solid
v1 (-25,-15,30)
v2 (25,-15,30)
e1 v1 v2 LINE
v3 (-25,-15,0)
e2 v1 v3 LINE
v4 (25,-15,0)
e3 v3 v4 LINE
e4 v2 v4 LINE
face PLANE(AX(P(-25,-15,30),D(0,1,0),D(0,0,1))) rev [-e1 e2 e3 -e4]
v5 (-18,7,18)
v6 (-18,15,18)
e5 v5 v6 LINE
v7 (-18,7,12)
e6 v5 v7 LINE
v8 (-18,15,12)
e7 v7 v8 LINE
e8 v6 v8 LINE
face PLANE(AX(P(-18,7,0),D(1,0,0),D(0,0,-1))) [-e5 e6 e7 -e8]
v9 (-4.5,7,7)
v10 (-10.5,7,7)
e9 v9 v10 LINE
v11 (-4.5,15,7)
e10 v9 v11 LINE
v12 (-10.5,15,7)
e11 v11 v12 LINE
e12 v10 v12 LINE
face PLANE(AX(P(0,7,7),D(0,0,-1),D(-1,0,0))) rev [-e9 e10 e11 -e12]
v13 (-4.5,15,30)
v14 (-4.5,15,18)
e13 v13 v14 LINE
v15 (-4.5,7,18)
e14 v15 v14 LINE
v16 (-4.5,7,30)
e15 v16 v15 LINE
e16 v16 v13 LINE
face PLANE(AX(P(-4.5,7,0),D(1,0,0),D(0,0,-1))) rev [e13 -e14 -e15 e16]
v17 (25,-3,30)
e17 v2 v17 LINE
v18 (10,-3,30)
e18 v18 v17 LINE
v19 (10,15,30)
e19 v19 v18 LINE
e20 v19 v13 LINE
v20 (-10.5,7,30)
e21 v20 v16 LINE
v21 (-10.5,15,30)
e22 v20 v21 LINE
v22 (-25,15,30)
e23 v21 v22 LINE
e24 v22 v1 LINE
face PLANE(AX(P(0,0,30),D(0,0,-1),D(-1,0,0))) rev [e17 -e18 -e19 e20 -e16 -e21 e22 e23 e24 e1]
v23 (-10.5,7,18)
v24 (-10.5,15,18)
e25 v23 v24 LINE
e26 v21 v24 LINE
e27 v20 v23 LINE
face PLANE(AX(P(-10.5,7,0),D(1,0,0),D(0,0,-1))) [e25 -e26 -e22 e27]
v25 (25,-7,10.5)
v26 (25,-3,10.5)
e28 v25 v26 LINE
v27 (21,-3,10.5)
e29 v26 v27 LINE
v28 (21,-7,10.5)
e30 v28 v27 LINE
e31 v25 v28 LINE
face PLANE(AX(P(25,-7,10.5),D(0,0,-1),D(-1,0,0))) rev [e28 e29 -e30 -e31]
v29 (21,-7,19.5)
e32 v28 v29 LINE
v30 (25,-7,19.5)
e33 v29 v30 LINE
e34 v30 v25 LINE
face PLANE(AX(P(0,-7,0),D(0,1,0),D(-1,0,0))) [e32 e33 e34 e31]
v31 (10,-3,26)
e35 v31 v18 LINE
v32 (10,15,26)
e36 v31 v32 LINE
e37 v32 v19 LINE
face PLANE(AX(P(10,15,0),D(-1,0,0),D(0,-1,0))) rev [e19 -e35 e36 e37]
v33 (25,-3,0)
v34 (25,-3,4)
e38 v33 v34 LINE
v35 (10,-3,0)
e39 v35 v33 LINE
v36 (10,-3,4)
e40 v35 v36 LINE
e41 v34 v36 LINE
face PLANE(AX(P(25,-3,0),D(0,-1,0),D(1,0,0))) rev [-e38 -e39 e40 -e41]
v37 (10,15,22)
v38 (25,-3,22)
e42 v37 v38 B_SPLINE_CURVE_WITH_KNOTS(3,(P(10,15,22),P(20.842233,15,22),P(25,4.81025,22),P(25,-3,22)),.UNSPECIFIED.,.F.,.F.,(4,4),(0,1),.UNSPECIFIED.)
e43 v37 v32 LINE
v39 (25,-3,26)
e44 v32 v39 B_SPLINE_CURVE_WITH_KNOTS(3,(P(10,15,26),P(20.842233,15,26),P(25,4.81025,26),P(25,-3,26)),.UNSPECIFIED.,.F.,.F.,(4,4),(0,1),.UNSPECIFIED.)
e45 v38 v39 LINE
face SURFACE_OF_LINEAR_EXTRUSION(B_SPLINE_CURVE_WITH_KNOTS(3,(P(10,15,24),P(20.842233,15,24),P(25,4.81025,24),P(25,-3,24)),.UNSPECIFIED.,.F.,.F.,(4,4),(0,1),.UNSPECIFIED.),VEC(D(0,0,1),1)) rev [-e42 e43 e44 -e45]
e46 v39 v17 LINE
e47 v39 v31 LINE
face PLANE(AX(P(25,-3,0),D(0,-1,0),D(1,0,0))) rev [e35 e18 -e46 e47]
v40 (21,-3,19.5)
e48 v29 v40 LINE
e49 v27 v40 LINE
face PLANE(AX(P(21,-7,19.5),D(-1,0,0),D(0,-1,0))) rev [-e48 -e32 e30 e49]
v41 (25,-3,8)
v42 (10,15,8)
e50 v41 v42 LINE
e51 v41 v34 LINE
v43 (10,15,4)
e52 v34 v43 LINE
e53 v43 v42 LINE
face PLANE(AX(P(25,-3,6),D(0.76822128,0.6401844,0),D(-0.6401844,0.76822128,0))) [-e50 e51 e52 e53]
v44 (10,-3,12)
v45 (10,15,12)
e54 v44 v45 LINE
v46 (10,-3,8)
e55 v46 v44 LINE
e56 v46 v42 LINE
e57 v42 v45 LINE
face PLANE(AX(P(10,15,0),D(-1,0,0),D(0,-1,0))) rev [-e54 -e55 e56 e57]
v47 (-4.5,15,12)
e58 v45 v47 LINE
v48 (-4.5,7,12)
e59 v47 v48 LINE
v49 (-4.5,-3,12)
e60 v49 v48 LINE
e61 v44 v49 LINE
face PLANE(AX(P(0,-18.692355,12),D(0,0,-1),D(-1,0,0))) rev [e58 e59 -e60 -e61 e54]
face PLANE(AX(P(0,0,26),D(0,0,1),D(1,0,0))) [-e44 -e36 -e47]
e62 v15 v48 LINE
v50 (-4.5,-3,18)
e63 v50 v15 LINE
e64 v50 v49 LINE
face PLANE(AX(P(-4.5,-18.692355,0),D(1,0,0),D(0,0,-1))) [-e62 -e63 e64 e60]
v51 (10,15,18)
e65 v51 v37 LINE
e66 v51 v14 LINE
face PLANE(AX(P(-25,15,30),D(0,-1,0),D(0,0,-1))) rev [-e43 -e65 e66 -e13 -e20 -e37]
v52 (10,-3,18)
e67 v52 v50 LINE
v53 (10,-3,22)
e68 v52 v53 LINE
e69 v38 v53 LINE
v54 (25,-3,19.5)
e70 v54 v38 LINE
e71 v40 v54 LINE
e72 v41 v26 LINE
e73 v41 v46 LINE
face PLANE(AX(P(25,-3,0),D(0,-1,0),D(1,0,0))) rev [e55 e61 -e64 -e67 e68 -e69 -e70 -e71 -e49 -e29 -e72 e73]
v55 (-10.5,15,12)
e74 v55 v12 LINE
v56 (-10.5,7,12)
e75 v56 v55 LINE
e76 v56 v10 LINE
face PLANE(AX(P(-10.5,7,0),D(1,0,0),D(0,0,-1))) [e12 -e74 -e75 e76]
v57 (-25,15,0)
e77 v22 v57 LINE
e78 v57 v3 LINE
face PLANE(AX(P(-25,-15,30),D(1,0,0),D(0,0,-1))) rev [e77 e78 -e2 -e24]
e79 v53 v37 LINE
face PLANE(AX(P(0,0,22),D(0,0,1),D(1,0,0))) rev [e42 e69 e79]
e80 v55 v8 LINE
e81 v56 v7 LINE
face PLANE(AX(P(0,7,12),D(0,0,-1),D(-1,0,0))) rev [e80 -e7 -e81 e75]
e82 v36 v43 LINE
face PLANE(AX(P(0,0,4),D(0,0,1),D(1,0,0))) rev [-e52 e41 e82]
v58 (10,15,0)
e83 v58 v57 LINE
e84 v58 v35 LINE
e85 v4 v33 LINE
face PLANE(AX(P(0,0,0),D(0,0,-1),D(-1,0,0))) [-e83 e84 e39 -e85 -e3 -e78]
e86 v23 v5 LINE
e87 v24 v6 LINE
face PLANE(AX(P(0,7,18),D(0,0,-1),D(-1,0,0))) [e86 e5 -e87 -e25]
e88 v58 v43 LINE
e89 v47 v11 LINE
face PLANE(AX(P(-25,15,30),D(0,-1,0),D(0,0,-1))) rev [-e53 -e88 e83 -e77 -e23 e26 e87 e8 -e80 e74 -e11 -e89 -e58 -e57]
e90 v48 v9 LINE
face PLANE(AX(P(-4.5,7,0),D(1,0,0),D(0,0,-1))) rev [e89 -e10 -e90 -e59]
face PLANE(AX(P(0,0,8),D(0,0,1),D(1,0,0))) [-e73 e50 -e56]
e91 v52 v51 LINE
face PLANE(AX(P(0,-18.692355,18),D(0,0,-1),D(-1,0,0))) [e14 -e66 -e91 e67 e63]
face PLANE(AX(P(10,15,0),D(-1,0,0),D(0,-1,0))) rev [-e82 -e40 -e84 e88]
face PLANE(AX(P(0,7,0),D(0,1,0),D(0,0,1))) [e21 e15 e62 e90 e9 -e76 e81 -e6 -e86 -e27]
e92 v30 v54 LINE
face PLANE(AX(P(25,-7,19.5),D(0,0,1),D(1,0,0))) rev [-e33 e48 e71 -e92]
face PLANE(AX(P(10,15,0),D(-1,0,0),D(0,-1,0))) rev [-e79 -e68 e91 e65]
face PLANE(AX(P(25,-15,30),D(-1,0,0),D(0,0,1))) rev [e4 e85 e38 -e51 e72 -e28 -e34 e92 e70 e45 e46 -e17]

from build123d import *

# Parameters (mm, degrees)
SKETCH_1_W          = 50
SKETCH_1_H          = 30
EXTRUDE_1_DEPTH     = 30
SKETCH_2_W          = 15
SKETCH_2_H          = 18
CUT_EXTRUDE_1_DEPTH = 42.833001327
SKETCH_3_W          = 14.5
SKETCH_3_H          = 6
CUT_EXTRUDE_2_DEPTH = 18
SKETCH_3_3_W        = 6
SKETCH_3_3_H        = 12
SKETCH_3_3_H_2      = 6
SKETCH_3_3_H_3      = 5
SKETCH_3_3_W_2      = 7.5
CUT_EXTRUDE_3_DEPTH = 8
RIB_START           = -2
RIB_1_DEPTH         = 4
RIB_2_REACH         = 39.762
SKETCH_5_WALL_W     = 100.955579594
SKETCH_5_WALL_H     = 4
SKETCH_6_W          = 4
SKETCH_6_H          = 9
CUT_EXTRUDE_4_DEPTH = 4


# Read off the part's stored shape, not the designer's step: Ребро1
with BuildPart() as part:
    # Эскиз1 → Бобышка-Вытянуть1 (new body)
    with BuildSketch(Plane.XY):
        Rectangle(SKETCH_1_W, SKETCH_1_H)
    extrude(amount=EXTRUDE_1_DEPTH)

    # Эскиз2 → Вырез-Вытянуть1 (cut, through all)
    with BuildSketch(Plane.XY.offset(30)):
        with Locations((17.5, 6)):
            Rectangle(SKETCH_2_W, SKETCH_2_H)
    extrude(amount=-CUT_EXTRUDE_1_DEPTH, mode=Mode.SUBTRACT)

    # Эскиз3 → Вырез-Вытянуть2 (cut)
    with BuildSketch(Plane(origin=(0, 15, 0), x_dir=(1, 0, 0), z_dir=(0, 1, 0))):
        with Locations((2.75, -15)):
            Rectangle(SKETCH_3_W, SKETCH_3_H)
    extrude(amount=-CUT_EXTRUDE_2_DEPTH, mode=Mode.SUBTRACT)

    # Эскиз3<3> → Вырез-Вытянуть3 (cut)
    with BuildSketch(Plane(origin=(0, 15, 0), x_dir=(1, 0, 0), z_dir=(0, 1, 0))):
        with Locations((-7.5, -24)):
            Rectangle(SKETCH_3_3_W, SKETCH_3_3_H)
        with Locations((-7.5, -15)):
            Rectangle(SKETCH_3_3_W, SKETCH_3_3_H_2)
        with Locations((-7.5, -9.5)):
            Rectangle(SKETCH_3_3_W, SKETCH_3_3_H_3)
        with Locations((-14.25, -15)):
            Rectangle(SKETCH_3_3_W_2, SKETCH_3_3_H_2)
    extrude(amount=-CUT_EXTRUDE_3_DEPTH, mode=Mode.SUBTRACT)

    # Ребро1 outline → Ребро1 (add)
    with BuildSketch(Plane.XY.offset(24).offset(RIB_START)):
        with BuildLine():
            add(Edge.make_bspline(
                [(10, 15), (20.842232601, 15), (25, 4.810249676), (25, -3)],
                knots=[0, 0, 0, 0, 1, 1, 1, 1], degree=3))
            Line((10, 15), (10, -3))
            Line((10, -3), (25, -3))
        make_face()
    extrude(amount=RIB_1_DEPTH)

    # Эскиз5 wall → Ребро2 (add, up to next)
    with BuildSketch(Plane(origin=(17.5, 6, 6), x_dir=(-0.640184399664, 0.768221279597, 0), z_dir=(-0.768221279597, -0.640184399664, 0)), mode=Mode.PRIVATE) as rib_2_sk1:
        Rectangle(SKETCH_5_WALL_W, SKETCH_5_WALL_H)
    rib_2_tool1 = extrude(rib_2_sk1.sketch, amount=RIB_2_REACH, mode=Mode.PRIVATE) - part.part
    add(rib_2_tool1.solids().sort_by_distance((17.5, 6, 6))[0])

    # Эскиз6 → Вырез-Вытянуть4 (cut)
    with BuildSketch(Plane(origin=(0, -3, 0), x_dir=(1, 0, 0), z_dir=(0, 1, 0))):
        with Locations((23, -15)):
            Rectangle(SKETCH_6_W, SKETCH_6_H)
    extrude(amount=-CUT_EXTRUDE_4_DEPTH, mode=Mode.SUBTRACT)


solid = part.part
